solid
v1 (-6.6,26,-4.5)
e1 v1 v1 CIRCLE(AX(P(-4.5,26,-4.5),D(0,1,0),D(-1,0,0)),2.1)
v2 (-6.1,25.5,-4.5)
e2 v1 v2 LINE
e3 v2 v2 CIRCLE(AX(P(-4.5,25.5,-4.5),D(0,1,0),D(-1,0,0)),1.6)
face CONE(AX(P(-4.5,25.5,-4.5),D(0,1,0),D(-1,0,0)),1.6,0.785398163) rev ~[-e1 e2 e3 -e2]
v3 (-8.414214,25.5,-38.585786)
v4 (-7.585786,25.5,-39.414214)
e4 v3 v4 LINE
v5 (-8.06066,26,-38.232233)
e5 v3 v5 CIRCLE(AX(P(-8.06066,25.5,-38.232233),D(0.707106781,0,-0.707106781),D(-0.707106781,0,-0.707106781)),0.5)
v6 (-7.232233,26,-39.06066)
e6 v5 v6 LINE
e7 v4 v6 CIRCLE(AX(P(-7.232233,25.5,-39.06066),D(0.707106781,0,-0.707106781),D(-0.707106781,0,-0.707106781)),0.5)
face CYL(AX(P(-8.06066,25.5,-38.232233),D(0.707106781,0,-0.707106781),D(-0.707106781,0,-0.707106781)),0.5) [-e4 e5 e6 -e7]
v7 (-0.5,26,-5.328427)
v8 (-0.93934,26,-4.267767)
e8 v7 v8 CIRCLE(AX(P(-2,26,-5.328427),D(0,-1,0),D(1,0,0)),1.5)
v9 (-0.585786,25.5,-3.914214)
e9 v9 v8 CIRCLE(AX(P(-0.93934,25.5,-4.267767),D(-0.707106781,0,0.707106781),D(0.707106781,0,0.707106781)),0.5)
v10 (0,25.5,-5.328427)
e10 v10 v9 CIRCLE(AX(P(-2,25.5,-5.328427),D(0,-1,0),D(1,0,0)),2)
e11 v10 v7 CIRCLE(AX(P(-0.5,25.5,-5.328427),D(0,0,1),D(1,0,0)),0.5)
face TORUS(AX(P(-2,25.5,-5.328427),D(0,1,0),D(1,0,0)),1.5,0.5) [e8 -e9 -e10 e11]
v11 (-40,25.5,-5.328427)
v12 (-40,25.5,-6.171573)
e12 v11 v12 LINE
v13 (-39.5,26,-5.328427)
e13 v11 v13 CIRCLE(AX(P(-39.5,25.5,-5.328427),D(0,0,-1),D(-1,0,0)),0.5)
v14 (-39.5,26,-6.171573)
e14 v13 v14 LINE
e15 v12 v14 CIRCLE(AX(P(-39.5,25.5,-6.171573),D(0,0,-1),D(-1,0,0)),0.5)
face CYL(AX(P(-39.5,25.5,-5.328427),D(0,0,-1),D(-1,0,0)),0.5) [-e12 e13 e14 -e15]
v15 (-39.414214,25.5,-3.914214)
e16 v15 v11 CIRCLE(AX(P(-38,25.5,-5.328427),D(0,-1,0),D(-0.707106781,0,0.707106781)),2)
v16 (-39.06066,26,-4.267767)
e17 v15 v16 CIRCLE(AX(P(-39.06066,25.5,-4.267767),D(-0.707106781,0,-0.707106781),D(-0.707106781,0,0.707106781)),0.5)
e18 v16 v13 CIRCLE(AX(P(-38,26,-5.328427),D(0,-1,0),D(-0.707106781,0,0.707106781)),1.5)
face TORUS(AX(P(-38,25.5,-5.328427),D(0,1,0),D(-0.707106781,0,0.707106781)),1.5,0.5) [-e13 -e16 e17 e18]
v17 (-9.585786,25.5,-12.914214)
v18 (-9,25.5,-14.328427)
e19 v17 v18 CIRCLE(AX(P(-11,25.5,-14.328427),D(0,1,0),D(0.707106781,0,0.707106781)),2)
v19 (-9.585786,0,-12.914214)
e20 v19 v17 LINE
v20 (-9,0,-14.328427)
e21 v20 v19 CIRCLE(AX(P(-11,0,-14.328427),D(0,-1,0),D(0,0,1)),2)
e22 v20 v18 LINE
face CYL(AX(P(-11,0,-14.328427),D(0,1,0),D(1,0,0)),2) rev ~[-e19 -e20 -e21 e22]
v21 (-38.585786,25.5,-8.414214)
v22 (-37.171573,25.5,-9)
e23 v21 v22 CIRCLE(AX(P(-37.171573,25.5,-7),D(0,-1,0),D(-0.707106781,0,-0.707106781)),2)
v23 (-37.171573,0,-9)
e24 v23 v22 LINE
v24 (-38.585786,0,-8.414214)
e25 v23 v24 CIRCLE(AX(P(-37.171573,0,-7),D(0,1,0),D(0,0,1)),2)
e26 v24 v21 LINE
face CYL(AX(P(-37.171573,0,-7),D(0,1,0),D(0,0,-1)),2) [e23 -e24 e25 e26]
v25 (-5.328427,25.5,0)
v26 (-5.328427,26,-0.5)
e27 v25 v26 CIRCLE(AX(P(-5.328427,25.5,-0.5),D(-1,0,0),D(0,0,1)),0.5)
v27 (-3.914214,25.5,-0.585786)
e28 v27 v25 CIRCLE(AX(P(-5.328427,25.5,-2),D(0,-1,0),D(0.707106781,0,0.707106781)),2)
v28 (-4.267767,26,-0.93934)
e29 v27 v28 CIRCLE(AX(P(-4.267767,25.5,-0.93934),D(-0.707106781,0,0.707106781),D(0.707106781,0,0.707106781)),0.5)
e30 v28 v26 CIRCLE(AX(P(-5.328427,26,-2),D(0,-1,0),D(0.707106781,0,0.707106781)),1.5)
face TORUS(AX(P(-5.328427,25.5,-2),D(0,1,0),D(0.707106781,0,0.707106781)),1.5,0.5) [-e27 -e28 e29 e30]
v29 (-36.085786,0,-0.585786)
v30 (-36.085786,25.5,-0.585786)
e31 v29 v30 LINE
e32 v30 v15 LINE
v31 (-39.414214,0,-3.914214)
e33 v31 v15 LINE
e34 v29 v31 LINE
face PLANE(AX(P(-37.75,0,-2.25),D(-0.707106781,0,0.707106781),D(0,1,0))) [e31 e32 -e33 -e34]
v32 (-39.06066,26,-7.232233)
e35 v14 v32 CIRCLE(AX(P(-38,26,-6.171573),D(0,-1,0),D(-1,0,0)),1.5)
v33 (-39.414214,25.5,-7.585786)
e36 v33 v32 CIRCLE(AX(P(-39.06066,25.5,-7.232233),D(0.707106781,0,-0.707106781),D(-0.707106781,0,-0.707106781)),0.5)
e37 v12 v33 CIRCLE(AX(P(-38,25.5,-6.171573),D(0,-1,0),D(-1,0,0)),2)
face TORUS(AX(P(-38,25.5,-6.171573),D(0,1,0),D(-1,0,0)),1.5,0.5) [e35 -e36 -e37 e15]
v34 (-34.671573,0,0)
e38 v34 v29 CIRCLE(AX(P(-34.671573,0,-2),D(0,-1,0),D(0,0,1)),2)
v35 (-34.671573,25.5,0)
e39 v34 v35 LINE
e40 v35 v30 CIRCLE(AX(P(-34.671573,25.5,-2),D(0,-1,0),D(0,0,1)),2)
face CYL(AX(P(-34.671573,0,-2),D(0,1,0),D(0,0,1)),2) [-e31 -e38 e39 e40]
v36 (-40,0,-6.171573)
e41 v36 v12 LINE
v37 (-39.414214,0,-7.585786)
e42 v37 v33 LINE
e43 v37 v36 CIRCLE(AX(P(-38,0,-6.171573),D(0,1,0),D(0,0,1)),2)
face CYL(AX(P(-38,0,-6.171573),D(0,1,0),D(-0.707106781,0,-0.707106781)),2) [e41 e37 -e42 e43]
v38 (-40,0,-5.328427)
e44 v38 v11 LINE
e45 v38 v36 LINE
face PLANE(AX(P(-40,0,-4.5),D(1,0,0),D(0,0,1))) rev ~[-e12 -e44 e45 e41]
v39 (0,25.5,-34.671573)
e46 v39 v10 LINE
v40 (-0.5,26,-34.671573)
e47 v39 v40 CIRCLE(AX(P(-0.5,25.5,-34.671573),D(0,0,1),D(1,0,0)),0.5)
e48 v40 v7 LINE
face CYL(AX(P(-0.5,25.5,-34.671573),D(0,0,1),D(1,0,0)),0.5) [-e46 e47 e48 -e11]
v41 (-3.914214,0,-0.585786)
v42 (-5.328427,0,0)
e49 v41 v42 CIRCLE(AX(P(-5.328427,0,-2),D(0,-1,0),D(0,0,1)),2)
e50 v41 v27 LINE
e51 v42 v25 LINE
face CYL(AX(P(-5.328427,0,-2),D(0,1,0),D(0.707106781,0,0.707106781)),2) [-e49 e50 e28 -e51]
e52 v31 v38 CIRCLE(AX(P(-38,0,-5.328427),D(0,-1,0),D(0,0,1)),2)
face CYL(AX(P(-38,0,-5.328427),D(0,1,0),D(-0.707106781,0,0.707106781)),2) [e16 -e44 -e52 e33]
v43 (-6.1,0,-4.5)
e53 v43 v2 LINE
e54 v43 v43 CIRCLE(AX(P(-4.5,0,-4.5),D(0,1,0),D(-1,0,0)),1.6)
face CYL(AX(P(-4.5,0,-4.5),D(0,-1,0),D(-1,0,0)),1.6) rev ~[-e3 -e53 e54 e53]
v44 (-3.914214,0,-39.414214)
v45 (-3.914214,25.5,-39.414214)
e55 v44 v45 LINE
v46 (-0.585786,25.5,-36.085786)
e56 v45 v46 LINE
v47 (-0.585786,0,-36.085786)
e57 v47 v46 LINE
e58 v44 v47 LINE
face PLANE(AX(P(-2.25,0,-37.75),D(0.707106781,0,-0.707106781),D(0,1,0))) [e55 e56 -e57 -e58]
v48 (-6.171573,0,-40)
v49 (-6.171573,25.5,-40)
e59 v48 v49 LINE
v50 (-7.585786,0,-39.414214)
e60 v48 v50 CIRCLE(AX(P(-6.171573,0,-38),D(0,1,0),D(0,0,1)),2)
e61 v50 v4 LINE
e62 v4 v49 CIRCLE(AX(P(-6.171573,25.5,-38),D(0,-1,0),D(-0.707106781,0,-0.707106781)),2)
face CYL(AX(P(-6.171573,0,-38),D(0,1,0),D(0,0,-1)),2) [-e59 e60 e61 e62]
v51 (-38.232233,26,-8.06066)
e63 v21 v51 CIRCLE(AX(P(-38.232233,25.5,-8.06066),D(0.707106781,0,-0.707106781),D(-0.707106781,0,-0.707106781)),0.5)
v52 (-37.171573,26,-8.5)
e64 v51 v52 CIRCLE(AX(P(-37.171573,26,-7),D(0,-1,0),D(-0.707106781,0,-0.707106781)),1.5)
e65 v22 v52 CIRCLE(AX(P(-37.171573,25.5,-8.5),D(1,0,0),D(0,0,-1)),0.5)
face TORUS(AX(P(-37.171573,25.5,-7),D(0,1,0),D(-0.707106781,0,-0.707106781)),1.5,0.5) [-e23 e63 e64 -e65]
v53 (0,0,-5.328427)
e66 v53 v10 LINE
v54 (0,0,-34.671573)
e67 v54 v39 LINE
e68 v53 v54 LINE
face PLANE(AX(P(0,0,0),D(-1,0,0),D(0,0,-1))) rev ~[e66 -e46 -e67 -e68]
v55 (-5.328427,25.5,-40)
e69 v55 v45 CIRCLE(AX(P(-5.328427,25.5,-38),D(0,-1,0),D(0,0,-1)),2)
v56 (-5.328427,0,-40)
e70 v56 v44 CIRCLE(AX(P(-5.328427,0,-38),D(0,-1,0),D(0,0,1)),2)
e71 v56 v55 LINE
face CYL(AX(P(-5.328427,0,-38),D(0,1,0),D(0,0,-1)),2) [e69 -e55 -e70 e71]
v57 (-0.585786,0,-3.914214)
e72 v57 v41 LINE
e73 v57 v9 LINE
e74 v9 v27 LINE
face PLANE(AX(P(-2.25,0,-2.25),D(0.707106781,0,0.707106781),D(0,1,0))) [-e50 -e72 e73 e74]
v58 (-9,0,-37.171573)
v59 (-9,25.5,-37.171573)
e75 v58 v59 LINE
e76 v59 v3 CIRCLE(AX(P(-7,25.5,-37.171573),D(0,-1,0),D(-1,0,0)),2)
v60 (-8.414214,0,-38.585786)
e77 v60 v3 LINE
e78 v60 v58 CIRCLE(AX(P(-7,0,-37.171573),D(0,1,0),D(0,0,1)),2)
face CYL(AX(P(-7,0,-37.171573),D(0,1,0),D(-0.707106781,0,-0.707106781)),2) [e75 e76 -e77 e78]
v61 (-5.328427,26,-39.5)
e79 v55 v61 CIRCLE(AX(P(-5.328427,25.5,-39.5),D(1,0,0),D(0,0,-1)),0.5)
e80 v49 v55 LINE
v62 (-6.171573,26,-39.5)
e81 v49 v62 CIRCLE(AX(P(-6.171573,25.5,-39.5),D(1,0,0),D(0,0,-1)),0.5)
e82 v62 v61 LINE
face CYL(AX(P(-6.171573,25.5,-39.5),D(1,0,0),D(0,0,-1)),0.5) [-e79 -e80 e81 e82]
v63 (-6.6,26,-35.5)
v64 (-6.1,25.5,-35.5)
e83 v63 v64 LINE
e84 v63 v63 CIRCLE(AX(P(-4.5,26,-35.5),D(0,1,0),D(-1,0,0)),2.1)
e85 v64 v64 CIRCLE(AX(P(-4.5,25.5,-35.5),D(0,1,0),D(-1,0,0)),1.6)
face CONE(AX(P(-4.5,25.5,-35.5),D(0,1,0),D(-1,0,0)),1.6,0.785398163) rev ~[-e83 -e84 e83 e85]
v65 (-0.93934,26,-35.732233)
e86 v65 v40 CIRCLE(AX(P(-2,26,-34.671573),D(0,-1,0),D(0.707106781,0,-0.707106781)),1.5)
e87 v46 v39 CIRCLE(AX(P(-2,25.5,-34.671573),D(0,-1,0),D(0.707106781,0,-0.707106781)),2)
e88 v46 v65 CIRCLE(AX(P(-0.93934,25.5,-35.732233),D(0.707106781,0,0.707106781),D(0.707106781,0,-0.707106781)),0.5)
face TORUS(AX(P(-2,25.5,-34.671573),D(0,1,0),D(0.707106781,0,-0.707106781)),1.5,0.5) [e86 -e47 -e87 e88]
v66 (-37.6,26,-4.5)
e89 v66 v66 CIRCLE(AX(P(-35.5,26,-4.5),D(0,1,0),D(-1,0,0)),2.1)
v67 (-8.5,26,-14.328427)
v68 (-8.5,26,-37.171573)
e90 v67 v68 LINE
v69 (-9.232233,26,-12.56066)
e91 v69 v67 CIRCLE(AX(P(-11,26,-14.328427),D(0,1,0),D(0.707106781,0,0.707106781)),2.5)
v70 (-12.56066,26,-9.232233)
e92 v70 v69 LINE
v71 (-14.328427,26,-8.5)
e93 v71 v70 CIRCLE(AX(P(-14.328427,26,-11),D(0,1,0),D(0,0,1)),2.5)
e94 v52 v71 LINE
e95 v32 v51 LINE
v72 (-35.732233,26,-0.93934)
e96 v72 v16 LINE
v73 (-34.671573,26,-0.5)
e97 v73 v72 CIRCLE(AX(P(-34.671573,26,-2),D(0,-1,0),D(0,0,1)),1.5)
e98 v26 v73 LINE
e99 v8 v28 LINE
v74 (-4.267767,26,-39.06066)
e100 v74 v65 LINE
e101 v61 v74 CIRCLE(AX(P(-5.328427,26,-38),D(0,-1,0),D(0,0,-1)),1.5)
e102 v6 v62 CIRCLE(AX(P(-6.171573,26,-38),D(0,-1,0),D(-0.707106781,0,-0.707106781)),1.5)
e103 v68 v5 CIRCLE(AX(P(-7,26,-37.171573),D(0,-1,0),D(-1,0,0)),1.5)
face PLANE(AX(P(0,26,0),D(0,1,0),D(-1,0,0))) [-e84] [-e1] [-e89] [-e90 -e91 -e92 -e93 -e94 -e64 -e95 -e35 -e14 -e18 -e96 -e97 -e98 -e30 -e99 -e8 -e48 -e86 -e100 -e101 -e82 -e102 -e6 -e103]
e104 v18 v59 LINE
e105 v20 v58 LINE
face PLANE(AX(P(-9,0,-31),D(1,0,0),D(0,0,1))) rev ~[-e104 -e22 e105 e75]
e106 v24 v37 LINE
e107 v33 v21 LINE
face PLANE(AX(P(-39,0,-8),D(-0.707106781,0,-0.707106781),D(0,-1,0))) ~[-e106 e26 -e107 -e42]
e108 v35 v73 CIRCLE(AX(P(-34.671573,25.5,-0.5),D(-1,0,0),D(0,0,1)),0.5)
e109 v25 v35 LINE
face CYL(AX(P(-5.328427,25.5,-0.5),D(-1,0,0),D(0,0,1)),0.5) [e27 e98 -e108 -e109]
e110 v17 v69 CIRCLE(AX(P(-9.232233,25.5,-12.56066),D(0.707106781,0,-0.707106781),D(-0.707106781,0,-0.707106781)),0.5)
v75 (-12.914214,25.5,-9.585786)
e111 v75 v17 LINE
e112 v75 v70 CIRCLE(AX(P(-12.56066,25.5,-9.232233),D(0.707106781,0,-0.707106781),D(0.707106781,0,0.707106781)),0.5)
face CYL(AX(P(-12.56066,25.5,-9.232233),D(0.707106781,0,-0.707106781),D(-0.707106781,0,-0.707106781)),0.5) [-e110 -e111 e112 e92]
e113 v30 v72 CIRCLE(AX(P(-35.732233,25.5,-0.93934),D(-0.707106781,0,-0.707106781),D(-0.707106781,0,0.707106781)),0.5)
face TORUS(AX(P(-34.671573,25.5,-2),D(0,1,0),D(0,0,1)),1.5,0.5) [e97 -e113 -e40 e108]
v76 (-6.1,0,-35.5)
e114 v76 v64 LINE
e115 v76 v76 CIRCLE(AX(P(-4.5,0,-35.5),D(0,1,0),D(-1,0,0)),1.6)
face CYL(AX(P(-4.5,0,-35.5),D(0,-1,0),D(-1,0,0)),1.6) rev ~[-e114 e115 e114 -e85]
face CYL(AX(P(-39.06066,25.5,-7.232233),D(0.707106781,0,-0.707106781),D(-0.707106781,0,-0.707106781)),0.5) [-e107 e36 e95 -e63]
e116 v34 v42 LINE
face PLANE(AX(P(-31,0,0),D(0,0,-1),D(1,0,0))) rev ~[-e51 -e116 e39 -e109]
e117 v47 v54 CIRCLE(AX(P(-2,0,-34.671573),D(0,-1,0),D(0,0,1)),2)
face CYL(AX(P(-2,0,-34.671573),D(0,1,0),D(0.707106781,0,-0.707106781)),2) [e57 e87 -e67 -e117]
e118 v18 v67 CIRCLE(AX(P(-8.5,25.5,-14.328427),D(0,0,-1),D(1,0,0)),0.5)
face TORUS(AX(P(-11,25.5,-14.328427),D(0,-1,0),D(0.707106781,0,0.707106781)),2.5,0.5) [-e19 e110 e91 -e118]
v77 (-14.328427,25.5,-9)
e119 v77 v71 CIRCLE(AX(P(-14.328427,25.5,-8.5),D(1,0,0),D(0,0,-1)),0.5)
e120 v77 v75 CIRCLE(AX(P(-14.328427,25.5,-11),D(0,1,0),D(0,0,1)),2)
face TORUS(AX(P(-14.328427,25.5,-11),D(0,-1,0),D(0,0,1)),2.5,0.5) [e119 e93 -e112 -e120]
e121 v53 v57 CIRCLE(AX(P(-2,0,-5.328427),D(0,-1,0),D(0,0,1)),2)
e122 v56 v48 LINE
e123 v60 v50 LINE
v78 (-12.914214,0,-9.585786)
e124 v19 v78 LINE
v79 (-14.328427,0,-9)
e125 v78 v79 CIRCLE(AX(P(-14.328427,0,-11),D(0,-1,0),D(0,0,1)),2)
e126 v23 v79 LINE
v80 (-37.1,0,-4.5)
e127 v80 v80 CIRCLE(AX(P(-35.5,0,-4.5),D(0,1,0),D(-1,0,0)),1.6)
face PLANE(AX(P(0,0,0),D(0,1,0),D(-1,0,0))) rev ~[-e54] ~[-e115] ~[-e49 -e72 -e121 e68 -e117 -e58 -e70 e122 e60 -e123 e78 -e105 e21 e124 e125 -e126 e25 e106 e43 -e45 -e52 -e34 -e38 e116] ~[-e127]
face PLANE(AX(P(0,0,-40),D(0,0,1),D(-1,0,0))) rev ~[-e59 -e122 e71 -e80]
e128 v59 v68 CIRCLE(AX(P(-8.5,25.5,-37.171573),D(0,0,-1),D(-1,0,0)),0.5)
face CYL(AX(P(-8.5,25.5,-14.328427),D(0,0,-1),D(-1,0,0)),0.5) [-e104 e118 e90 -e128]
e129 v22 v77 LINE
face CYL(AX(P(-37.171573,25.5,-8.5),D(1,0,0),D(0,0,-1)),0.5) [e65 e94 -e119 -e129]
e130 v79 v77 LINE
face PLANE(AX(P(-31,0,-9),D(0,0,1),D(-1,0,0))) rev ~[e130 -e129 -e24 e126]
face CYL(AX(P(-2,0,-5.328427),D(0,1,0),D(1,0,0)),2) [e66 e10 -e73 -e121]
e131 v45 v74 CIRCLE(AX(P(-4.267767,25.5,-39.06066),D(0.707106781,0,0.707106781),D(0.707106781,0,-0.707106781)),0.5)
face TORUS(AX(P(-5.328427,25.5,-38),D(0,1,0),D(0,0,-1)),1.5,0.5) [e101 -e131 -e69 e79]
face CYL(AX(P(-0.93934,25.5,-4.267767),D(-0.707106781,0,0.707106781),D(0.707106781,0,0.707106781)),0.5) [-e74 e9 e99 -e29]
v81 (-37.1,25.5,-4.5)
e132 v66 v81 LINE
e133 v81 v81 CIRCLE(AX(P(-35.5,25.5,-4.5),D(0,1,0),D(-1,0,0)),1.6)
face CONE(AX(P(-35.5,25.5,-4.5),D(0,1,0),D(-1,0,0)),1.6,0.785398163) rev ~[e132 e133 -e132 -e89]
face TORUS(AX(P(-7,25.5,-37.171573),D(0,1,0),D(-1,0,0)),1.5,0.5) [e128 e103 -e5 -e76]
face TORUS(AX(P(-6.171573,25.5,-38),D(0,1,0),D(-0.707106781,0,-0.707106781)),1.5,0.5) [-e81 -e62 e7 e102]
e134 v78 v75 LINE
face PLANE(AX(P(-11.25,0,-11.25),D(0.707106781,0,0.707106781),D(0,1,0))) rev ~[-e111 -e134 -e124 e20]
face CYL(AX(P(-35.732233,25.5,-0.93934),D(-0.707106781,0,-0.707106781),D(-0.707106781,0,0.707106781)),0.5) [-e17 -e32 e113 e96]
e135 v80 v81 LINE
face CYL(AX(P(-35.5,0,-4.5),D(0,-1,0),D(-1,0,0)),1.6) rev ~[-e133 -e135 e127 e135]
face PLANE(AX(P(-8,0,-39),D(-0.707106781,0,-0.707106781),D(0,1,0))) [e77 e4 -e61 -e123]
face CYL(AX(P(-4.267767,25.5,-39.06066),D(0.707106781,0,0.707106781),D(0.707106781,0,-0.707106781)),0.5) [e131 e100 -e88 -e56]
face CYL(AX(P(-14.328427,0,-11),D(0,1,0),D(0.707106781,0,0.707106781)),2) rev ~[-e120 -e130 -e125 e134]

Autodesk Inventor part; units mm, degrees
ref_plane "YZ Plane" through (0, 0, 0) normal (1, 0, 0) x (0, 1, 0)
ref_plane "XZ Plane" through (0, 0, 0) normal (0, 1, 0) x (-1, 0, 0)
ref_plane "XY Plane" through (0, 0, 0) normal (0, 0, 1) x (1, 0, 0)
sketch "Sketch1" plane through (0, 0, 0) normal (0, 1, 0) x (-1, 0, 0)
  line L0 (0, 0) -> (0, -35.5002)
  line L1 (9, -9) -> (35.5, -9)
  line L2 (35.5002, 0) -> (0, 0)
  circle A0 centre (4.5, -4.5) radius 1.6
  circle A1 centre (35.5, -4.5) radius 1.6
  circle A2 centre (4.5, -35.5) radius 1.6
  line L3 (9, -35.5) -> (9, -9)
  line L4 (31, -9) -> (40, -9)
  line L5 (40, -9) -> (40, 0)
  line L6 (40, 0) -> (31, 0)
  line L7 (31, -9) -> (40, 0) construction
  line L8 (40, -9) -> (31, 0) construction
  line L9 (0, -31) -> (0, -40)
  line L10 (0, -40) -> (9, -40)
  line L11 (9, -40) -> (9, -31)
  line L12 (9, -31) -> (0, -40) construction
  line L13 (0, -31) -> (9, -40) construction
  arc A3 (35.4998, 0) -> (35.4998, 0) centre (35.5, -4.5) ccw
  point P0 (0, 0)
  point P1 (0, -9)
  dimension "d8" = 3.2
  dimension "d21" = 4.5
  dimension "d22" = 31
  dimension "d23" = 31
  dimension "d38" = 4.5
extrude "Extrusion1" add sketch "Sketch1" along normal blind 26
chamfer "Chamfer2" distance 2 angle 45 2 edges at (-40, 13, -9) (-9, 13, -40)
chamfer "Chamfer3" distance 4.5 angle 45 4 edges at (-40, 13, 0) (0, 13, 0) (0, 13, -40) (-9, 13, -9)
fillet "Fillet4" radius 2 12 edges at (-40, 13, -7) (-35.5, 13, 0) (-40, 13, -4.5) (-38, 13, -9) (-9, 13, -38) (-7, 13, -40) (-4.5, 13, -40) (0, 13, -35.5) (0, 13, -4.5) (-4.5, 13, 0) (-13.5, 13, -9) (-9, 13, -13.5)
fillet "Fillet5" radius 0.5 23 edges at (-4.5631, 26, -0.1522) (-2.25, 26, -2.25) (-0.1522, 26, -4.5631) (0, 26, -20) (-0.1522, 26, -35.4369) (-2.25, 26, -37.75) (-4.5631, 26, -39.8478) (-5.75, 26, -40) (-6.9369, 26, -39.8478) (-8, 26, -39) (-8.8478, 26, -37.9369) (-9, 26, -24.9142) (-9, 26, -36.3358) (-24.9142, 26, -9) (-36.3358, 26, -9) (-37.9369, 26, -8.8478) (-39, 26, -8) (-39.8478, 26, -6.9369) (-40, 26, -5.75) (-39.8478, 26, -4.5631) (-37.75, 26, -2.25) (-35.4369, 26, -0.1522) (-20, 26, 0)
chamfer "Chamfer4" distance 0.5 angle 45 3 edges at (-33.9, 26, -4.5) (-2.9, 26, -4.5) (-2.9, 26, -35.5)
properties part number "stepper spacer"
